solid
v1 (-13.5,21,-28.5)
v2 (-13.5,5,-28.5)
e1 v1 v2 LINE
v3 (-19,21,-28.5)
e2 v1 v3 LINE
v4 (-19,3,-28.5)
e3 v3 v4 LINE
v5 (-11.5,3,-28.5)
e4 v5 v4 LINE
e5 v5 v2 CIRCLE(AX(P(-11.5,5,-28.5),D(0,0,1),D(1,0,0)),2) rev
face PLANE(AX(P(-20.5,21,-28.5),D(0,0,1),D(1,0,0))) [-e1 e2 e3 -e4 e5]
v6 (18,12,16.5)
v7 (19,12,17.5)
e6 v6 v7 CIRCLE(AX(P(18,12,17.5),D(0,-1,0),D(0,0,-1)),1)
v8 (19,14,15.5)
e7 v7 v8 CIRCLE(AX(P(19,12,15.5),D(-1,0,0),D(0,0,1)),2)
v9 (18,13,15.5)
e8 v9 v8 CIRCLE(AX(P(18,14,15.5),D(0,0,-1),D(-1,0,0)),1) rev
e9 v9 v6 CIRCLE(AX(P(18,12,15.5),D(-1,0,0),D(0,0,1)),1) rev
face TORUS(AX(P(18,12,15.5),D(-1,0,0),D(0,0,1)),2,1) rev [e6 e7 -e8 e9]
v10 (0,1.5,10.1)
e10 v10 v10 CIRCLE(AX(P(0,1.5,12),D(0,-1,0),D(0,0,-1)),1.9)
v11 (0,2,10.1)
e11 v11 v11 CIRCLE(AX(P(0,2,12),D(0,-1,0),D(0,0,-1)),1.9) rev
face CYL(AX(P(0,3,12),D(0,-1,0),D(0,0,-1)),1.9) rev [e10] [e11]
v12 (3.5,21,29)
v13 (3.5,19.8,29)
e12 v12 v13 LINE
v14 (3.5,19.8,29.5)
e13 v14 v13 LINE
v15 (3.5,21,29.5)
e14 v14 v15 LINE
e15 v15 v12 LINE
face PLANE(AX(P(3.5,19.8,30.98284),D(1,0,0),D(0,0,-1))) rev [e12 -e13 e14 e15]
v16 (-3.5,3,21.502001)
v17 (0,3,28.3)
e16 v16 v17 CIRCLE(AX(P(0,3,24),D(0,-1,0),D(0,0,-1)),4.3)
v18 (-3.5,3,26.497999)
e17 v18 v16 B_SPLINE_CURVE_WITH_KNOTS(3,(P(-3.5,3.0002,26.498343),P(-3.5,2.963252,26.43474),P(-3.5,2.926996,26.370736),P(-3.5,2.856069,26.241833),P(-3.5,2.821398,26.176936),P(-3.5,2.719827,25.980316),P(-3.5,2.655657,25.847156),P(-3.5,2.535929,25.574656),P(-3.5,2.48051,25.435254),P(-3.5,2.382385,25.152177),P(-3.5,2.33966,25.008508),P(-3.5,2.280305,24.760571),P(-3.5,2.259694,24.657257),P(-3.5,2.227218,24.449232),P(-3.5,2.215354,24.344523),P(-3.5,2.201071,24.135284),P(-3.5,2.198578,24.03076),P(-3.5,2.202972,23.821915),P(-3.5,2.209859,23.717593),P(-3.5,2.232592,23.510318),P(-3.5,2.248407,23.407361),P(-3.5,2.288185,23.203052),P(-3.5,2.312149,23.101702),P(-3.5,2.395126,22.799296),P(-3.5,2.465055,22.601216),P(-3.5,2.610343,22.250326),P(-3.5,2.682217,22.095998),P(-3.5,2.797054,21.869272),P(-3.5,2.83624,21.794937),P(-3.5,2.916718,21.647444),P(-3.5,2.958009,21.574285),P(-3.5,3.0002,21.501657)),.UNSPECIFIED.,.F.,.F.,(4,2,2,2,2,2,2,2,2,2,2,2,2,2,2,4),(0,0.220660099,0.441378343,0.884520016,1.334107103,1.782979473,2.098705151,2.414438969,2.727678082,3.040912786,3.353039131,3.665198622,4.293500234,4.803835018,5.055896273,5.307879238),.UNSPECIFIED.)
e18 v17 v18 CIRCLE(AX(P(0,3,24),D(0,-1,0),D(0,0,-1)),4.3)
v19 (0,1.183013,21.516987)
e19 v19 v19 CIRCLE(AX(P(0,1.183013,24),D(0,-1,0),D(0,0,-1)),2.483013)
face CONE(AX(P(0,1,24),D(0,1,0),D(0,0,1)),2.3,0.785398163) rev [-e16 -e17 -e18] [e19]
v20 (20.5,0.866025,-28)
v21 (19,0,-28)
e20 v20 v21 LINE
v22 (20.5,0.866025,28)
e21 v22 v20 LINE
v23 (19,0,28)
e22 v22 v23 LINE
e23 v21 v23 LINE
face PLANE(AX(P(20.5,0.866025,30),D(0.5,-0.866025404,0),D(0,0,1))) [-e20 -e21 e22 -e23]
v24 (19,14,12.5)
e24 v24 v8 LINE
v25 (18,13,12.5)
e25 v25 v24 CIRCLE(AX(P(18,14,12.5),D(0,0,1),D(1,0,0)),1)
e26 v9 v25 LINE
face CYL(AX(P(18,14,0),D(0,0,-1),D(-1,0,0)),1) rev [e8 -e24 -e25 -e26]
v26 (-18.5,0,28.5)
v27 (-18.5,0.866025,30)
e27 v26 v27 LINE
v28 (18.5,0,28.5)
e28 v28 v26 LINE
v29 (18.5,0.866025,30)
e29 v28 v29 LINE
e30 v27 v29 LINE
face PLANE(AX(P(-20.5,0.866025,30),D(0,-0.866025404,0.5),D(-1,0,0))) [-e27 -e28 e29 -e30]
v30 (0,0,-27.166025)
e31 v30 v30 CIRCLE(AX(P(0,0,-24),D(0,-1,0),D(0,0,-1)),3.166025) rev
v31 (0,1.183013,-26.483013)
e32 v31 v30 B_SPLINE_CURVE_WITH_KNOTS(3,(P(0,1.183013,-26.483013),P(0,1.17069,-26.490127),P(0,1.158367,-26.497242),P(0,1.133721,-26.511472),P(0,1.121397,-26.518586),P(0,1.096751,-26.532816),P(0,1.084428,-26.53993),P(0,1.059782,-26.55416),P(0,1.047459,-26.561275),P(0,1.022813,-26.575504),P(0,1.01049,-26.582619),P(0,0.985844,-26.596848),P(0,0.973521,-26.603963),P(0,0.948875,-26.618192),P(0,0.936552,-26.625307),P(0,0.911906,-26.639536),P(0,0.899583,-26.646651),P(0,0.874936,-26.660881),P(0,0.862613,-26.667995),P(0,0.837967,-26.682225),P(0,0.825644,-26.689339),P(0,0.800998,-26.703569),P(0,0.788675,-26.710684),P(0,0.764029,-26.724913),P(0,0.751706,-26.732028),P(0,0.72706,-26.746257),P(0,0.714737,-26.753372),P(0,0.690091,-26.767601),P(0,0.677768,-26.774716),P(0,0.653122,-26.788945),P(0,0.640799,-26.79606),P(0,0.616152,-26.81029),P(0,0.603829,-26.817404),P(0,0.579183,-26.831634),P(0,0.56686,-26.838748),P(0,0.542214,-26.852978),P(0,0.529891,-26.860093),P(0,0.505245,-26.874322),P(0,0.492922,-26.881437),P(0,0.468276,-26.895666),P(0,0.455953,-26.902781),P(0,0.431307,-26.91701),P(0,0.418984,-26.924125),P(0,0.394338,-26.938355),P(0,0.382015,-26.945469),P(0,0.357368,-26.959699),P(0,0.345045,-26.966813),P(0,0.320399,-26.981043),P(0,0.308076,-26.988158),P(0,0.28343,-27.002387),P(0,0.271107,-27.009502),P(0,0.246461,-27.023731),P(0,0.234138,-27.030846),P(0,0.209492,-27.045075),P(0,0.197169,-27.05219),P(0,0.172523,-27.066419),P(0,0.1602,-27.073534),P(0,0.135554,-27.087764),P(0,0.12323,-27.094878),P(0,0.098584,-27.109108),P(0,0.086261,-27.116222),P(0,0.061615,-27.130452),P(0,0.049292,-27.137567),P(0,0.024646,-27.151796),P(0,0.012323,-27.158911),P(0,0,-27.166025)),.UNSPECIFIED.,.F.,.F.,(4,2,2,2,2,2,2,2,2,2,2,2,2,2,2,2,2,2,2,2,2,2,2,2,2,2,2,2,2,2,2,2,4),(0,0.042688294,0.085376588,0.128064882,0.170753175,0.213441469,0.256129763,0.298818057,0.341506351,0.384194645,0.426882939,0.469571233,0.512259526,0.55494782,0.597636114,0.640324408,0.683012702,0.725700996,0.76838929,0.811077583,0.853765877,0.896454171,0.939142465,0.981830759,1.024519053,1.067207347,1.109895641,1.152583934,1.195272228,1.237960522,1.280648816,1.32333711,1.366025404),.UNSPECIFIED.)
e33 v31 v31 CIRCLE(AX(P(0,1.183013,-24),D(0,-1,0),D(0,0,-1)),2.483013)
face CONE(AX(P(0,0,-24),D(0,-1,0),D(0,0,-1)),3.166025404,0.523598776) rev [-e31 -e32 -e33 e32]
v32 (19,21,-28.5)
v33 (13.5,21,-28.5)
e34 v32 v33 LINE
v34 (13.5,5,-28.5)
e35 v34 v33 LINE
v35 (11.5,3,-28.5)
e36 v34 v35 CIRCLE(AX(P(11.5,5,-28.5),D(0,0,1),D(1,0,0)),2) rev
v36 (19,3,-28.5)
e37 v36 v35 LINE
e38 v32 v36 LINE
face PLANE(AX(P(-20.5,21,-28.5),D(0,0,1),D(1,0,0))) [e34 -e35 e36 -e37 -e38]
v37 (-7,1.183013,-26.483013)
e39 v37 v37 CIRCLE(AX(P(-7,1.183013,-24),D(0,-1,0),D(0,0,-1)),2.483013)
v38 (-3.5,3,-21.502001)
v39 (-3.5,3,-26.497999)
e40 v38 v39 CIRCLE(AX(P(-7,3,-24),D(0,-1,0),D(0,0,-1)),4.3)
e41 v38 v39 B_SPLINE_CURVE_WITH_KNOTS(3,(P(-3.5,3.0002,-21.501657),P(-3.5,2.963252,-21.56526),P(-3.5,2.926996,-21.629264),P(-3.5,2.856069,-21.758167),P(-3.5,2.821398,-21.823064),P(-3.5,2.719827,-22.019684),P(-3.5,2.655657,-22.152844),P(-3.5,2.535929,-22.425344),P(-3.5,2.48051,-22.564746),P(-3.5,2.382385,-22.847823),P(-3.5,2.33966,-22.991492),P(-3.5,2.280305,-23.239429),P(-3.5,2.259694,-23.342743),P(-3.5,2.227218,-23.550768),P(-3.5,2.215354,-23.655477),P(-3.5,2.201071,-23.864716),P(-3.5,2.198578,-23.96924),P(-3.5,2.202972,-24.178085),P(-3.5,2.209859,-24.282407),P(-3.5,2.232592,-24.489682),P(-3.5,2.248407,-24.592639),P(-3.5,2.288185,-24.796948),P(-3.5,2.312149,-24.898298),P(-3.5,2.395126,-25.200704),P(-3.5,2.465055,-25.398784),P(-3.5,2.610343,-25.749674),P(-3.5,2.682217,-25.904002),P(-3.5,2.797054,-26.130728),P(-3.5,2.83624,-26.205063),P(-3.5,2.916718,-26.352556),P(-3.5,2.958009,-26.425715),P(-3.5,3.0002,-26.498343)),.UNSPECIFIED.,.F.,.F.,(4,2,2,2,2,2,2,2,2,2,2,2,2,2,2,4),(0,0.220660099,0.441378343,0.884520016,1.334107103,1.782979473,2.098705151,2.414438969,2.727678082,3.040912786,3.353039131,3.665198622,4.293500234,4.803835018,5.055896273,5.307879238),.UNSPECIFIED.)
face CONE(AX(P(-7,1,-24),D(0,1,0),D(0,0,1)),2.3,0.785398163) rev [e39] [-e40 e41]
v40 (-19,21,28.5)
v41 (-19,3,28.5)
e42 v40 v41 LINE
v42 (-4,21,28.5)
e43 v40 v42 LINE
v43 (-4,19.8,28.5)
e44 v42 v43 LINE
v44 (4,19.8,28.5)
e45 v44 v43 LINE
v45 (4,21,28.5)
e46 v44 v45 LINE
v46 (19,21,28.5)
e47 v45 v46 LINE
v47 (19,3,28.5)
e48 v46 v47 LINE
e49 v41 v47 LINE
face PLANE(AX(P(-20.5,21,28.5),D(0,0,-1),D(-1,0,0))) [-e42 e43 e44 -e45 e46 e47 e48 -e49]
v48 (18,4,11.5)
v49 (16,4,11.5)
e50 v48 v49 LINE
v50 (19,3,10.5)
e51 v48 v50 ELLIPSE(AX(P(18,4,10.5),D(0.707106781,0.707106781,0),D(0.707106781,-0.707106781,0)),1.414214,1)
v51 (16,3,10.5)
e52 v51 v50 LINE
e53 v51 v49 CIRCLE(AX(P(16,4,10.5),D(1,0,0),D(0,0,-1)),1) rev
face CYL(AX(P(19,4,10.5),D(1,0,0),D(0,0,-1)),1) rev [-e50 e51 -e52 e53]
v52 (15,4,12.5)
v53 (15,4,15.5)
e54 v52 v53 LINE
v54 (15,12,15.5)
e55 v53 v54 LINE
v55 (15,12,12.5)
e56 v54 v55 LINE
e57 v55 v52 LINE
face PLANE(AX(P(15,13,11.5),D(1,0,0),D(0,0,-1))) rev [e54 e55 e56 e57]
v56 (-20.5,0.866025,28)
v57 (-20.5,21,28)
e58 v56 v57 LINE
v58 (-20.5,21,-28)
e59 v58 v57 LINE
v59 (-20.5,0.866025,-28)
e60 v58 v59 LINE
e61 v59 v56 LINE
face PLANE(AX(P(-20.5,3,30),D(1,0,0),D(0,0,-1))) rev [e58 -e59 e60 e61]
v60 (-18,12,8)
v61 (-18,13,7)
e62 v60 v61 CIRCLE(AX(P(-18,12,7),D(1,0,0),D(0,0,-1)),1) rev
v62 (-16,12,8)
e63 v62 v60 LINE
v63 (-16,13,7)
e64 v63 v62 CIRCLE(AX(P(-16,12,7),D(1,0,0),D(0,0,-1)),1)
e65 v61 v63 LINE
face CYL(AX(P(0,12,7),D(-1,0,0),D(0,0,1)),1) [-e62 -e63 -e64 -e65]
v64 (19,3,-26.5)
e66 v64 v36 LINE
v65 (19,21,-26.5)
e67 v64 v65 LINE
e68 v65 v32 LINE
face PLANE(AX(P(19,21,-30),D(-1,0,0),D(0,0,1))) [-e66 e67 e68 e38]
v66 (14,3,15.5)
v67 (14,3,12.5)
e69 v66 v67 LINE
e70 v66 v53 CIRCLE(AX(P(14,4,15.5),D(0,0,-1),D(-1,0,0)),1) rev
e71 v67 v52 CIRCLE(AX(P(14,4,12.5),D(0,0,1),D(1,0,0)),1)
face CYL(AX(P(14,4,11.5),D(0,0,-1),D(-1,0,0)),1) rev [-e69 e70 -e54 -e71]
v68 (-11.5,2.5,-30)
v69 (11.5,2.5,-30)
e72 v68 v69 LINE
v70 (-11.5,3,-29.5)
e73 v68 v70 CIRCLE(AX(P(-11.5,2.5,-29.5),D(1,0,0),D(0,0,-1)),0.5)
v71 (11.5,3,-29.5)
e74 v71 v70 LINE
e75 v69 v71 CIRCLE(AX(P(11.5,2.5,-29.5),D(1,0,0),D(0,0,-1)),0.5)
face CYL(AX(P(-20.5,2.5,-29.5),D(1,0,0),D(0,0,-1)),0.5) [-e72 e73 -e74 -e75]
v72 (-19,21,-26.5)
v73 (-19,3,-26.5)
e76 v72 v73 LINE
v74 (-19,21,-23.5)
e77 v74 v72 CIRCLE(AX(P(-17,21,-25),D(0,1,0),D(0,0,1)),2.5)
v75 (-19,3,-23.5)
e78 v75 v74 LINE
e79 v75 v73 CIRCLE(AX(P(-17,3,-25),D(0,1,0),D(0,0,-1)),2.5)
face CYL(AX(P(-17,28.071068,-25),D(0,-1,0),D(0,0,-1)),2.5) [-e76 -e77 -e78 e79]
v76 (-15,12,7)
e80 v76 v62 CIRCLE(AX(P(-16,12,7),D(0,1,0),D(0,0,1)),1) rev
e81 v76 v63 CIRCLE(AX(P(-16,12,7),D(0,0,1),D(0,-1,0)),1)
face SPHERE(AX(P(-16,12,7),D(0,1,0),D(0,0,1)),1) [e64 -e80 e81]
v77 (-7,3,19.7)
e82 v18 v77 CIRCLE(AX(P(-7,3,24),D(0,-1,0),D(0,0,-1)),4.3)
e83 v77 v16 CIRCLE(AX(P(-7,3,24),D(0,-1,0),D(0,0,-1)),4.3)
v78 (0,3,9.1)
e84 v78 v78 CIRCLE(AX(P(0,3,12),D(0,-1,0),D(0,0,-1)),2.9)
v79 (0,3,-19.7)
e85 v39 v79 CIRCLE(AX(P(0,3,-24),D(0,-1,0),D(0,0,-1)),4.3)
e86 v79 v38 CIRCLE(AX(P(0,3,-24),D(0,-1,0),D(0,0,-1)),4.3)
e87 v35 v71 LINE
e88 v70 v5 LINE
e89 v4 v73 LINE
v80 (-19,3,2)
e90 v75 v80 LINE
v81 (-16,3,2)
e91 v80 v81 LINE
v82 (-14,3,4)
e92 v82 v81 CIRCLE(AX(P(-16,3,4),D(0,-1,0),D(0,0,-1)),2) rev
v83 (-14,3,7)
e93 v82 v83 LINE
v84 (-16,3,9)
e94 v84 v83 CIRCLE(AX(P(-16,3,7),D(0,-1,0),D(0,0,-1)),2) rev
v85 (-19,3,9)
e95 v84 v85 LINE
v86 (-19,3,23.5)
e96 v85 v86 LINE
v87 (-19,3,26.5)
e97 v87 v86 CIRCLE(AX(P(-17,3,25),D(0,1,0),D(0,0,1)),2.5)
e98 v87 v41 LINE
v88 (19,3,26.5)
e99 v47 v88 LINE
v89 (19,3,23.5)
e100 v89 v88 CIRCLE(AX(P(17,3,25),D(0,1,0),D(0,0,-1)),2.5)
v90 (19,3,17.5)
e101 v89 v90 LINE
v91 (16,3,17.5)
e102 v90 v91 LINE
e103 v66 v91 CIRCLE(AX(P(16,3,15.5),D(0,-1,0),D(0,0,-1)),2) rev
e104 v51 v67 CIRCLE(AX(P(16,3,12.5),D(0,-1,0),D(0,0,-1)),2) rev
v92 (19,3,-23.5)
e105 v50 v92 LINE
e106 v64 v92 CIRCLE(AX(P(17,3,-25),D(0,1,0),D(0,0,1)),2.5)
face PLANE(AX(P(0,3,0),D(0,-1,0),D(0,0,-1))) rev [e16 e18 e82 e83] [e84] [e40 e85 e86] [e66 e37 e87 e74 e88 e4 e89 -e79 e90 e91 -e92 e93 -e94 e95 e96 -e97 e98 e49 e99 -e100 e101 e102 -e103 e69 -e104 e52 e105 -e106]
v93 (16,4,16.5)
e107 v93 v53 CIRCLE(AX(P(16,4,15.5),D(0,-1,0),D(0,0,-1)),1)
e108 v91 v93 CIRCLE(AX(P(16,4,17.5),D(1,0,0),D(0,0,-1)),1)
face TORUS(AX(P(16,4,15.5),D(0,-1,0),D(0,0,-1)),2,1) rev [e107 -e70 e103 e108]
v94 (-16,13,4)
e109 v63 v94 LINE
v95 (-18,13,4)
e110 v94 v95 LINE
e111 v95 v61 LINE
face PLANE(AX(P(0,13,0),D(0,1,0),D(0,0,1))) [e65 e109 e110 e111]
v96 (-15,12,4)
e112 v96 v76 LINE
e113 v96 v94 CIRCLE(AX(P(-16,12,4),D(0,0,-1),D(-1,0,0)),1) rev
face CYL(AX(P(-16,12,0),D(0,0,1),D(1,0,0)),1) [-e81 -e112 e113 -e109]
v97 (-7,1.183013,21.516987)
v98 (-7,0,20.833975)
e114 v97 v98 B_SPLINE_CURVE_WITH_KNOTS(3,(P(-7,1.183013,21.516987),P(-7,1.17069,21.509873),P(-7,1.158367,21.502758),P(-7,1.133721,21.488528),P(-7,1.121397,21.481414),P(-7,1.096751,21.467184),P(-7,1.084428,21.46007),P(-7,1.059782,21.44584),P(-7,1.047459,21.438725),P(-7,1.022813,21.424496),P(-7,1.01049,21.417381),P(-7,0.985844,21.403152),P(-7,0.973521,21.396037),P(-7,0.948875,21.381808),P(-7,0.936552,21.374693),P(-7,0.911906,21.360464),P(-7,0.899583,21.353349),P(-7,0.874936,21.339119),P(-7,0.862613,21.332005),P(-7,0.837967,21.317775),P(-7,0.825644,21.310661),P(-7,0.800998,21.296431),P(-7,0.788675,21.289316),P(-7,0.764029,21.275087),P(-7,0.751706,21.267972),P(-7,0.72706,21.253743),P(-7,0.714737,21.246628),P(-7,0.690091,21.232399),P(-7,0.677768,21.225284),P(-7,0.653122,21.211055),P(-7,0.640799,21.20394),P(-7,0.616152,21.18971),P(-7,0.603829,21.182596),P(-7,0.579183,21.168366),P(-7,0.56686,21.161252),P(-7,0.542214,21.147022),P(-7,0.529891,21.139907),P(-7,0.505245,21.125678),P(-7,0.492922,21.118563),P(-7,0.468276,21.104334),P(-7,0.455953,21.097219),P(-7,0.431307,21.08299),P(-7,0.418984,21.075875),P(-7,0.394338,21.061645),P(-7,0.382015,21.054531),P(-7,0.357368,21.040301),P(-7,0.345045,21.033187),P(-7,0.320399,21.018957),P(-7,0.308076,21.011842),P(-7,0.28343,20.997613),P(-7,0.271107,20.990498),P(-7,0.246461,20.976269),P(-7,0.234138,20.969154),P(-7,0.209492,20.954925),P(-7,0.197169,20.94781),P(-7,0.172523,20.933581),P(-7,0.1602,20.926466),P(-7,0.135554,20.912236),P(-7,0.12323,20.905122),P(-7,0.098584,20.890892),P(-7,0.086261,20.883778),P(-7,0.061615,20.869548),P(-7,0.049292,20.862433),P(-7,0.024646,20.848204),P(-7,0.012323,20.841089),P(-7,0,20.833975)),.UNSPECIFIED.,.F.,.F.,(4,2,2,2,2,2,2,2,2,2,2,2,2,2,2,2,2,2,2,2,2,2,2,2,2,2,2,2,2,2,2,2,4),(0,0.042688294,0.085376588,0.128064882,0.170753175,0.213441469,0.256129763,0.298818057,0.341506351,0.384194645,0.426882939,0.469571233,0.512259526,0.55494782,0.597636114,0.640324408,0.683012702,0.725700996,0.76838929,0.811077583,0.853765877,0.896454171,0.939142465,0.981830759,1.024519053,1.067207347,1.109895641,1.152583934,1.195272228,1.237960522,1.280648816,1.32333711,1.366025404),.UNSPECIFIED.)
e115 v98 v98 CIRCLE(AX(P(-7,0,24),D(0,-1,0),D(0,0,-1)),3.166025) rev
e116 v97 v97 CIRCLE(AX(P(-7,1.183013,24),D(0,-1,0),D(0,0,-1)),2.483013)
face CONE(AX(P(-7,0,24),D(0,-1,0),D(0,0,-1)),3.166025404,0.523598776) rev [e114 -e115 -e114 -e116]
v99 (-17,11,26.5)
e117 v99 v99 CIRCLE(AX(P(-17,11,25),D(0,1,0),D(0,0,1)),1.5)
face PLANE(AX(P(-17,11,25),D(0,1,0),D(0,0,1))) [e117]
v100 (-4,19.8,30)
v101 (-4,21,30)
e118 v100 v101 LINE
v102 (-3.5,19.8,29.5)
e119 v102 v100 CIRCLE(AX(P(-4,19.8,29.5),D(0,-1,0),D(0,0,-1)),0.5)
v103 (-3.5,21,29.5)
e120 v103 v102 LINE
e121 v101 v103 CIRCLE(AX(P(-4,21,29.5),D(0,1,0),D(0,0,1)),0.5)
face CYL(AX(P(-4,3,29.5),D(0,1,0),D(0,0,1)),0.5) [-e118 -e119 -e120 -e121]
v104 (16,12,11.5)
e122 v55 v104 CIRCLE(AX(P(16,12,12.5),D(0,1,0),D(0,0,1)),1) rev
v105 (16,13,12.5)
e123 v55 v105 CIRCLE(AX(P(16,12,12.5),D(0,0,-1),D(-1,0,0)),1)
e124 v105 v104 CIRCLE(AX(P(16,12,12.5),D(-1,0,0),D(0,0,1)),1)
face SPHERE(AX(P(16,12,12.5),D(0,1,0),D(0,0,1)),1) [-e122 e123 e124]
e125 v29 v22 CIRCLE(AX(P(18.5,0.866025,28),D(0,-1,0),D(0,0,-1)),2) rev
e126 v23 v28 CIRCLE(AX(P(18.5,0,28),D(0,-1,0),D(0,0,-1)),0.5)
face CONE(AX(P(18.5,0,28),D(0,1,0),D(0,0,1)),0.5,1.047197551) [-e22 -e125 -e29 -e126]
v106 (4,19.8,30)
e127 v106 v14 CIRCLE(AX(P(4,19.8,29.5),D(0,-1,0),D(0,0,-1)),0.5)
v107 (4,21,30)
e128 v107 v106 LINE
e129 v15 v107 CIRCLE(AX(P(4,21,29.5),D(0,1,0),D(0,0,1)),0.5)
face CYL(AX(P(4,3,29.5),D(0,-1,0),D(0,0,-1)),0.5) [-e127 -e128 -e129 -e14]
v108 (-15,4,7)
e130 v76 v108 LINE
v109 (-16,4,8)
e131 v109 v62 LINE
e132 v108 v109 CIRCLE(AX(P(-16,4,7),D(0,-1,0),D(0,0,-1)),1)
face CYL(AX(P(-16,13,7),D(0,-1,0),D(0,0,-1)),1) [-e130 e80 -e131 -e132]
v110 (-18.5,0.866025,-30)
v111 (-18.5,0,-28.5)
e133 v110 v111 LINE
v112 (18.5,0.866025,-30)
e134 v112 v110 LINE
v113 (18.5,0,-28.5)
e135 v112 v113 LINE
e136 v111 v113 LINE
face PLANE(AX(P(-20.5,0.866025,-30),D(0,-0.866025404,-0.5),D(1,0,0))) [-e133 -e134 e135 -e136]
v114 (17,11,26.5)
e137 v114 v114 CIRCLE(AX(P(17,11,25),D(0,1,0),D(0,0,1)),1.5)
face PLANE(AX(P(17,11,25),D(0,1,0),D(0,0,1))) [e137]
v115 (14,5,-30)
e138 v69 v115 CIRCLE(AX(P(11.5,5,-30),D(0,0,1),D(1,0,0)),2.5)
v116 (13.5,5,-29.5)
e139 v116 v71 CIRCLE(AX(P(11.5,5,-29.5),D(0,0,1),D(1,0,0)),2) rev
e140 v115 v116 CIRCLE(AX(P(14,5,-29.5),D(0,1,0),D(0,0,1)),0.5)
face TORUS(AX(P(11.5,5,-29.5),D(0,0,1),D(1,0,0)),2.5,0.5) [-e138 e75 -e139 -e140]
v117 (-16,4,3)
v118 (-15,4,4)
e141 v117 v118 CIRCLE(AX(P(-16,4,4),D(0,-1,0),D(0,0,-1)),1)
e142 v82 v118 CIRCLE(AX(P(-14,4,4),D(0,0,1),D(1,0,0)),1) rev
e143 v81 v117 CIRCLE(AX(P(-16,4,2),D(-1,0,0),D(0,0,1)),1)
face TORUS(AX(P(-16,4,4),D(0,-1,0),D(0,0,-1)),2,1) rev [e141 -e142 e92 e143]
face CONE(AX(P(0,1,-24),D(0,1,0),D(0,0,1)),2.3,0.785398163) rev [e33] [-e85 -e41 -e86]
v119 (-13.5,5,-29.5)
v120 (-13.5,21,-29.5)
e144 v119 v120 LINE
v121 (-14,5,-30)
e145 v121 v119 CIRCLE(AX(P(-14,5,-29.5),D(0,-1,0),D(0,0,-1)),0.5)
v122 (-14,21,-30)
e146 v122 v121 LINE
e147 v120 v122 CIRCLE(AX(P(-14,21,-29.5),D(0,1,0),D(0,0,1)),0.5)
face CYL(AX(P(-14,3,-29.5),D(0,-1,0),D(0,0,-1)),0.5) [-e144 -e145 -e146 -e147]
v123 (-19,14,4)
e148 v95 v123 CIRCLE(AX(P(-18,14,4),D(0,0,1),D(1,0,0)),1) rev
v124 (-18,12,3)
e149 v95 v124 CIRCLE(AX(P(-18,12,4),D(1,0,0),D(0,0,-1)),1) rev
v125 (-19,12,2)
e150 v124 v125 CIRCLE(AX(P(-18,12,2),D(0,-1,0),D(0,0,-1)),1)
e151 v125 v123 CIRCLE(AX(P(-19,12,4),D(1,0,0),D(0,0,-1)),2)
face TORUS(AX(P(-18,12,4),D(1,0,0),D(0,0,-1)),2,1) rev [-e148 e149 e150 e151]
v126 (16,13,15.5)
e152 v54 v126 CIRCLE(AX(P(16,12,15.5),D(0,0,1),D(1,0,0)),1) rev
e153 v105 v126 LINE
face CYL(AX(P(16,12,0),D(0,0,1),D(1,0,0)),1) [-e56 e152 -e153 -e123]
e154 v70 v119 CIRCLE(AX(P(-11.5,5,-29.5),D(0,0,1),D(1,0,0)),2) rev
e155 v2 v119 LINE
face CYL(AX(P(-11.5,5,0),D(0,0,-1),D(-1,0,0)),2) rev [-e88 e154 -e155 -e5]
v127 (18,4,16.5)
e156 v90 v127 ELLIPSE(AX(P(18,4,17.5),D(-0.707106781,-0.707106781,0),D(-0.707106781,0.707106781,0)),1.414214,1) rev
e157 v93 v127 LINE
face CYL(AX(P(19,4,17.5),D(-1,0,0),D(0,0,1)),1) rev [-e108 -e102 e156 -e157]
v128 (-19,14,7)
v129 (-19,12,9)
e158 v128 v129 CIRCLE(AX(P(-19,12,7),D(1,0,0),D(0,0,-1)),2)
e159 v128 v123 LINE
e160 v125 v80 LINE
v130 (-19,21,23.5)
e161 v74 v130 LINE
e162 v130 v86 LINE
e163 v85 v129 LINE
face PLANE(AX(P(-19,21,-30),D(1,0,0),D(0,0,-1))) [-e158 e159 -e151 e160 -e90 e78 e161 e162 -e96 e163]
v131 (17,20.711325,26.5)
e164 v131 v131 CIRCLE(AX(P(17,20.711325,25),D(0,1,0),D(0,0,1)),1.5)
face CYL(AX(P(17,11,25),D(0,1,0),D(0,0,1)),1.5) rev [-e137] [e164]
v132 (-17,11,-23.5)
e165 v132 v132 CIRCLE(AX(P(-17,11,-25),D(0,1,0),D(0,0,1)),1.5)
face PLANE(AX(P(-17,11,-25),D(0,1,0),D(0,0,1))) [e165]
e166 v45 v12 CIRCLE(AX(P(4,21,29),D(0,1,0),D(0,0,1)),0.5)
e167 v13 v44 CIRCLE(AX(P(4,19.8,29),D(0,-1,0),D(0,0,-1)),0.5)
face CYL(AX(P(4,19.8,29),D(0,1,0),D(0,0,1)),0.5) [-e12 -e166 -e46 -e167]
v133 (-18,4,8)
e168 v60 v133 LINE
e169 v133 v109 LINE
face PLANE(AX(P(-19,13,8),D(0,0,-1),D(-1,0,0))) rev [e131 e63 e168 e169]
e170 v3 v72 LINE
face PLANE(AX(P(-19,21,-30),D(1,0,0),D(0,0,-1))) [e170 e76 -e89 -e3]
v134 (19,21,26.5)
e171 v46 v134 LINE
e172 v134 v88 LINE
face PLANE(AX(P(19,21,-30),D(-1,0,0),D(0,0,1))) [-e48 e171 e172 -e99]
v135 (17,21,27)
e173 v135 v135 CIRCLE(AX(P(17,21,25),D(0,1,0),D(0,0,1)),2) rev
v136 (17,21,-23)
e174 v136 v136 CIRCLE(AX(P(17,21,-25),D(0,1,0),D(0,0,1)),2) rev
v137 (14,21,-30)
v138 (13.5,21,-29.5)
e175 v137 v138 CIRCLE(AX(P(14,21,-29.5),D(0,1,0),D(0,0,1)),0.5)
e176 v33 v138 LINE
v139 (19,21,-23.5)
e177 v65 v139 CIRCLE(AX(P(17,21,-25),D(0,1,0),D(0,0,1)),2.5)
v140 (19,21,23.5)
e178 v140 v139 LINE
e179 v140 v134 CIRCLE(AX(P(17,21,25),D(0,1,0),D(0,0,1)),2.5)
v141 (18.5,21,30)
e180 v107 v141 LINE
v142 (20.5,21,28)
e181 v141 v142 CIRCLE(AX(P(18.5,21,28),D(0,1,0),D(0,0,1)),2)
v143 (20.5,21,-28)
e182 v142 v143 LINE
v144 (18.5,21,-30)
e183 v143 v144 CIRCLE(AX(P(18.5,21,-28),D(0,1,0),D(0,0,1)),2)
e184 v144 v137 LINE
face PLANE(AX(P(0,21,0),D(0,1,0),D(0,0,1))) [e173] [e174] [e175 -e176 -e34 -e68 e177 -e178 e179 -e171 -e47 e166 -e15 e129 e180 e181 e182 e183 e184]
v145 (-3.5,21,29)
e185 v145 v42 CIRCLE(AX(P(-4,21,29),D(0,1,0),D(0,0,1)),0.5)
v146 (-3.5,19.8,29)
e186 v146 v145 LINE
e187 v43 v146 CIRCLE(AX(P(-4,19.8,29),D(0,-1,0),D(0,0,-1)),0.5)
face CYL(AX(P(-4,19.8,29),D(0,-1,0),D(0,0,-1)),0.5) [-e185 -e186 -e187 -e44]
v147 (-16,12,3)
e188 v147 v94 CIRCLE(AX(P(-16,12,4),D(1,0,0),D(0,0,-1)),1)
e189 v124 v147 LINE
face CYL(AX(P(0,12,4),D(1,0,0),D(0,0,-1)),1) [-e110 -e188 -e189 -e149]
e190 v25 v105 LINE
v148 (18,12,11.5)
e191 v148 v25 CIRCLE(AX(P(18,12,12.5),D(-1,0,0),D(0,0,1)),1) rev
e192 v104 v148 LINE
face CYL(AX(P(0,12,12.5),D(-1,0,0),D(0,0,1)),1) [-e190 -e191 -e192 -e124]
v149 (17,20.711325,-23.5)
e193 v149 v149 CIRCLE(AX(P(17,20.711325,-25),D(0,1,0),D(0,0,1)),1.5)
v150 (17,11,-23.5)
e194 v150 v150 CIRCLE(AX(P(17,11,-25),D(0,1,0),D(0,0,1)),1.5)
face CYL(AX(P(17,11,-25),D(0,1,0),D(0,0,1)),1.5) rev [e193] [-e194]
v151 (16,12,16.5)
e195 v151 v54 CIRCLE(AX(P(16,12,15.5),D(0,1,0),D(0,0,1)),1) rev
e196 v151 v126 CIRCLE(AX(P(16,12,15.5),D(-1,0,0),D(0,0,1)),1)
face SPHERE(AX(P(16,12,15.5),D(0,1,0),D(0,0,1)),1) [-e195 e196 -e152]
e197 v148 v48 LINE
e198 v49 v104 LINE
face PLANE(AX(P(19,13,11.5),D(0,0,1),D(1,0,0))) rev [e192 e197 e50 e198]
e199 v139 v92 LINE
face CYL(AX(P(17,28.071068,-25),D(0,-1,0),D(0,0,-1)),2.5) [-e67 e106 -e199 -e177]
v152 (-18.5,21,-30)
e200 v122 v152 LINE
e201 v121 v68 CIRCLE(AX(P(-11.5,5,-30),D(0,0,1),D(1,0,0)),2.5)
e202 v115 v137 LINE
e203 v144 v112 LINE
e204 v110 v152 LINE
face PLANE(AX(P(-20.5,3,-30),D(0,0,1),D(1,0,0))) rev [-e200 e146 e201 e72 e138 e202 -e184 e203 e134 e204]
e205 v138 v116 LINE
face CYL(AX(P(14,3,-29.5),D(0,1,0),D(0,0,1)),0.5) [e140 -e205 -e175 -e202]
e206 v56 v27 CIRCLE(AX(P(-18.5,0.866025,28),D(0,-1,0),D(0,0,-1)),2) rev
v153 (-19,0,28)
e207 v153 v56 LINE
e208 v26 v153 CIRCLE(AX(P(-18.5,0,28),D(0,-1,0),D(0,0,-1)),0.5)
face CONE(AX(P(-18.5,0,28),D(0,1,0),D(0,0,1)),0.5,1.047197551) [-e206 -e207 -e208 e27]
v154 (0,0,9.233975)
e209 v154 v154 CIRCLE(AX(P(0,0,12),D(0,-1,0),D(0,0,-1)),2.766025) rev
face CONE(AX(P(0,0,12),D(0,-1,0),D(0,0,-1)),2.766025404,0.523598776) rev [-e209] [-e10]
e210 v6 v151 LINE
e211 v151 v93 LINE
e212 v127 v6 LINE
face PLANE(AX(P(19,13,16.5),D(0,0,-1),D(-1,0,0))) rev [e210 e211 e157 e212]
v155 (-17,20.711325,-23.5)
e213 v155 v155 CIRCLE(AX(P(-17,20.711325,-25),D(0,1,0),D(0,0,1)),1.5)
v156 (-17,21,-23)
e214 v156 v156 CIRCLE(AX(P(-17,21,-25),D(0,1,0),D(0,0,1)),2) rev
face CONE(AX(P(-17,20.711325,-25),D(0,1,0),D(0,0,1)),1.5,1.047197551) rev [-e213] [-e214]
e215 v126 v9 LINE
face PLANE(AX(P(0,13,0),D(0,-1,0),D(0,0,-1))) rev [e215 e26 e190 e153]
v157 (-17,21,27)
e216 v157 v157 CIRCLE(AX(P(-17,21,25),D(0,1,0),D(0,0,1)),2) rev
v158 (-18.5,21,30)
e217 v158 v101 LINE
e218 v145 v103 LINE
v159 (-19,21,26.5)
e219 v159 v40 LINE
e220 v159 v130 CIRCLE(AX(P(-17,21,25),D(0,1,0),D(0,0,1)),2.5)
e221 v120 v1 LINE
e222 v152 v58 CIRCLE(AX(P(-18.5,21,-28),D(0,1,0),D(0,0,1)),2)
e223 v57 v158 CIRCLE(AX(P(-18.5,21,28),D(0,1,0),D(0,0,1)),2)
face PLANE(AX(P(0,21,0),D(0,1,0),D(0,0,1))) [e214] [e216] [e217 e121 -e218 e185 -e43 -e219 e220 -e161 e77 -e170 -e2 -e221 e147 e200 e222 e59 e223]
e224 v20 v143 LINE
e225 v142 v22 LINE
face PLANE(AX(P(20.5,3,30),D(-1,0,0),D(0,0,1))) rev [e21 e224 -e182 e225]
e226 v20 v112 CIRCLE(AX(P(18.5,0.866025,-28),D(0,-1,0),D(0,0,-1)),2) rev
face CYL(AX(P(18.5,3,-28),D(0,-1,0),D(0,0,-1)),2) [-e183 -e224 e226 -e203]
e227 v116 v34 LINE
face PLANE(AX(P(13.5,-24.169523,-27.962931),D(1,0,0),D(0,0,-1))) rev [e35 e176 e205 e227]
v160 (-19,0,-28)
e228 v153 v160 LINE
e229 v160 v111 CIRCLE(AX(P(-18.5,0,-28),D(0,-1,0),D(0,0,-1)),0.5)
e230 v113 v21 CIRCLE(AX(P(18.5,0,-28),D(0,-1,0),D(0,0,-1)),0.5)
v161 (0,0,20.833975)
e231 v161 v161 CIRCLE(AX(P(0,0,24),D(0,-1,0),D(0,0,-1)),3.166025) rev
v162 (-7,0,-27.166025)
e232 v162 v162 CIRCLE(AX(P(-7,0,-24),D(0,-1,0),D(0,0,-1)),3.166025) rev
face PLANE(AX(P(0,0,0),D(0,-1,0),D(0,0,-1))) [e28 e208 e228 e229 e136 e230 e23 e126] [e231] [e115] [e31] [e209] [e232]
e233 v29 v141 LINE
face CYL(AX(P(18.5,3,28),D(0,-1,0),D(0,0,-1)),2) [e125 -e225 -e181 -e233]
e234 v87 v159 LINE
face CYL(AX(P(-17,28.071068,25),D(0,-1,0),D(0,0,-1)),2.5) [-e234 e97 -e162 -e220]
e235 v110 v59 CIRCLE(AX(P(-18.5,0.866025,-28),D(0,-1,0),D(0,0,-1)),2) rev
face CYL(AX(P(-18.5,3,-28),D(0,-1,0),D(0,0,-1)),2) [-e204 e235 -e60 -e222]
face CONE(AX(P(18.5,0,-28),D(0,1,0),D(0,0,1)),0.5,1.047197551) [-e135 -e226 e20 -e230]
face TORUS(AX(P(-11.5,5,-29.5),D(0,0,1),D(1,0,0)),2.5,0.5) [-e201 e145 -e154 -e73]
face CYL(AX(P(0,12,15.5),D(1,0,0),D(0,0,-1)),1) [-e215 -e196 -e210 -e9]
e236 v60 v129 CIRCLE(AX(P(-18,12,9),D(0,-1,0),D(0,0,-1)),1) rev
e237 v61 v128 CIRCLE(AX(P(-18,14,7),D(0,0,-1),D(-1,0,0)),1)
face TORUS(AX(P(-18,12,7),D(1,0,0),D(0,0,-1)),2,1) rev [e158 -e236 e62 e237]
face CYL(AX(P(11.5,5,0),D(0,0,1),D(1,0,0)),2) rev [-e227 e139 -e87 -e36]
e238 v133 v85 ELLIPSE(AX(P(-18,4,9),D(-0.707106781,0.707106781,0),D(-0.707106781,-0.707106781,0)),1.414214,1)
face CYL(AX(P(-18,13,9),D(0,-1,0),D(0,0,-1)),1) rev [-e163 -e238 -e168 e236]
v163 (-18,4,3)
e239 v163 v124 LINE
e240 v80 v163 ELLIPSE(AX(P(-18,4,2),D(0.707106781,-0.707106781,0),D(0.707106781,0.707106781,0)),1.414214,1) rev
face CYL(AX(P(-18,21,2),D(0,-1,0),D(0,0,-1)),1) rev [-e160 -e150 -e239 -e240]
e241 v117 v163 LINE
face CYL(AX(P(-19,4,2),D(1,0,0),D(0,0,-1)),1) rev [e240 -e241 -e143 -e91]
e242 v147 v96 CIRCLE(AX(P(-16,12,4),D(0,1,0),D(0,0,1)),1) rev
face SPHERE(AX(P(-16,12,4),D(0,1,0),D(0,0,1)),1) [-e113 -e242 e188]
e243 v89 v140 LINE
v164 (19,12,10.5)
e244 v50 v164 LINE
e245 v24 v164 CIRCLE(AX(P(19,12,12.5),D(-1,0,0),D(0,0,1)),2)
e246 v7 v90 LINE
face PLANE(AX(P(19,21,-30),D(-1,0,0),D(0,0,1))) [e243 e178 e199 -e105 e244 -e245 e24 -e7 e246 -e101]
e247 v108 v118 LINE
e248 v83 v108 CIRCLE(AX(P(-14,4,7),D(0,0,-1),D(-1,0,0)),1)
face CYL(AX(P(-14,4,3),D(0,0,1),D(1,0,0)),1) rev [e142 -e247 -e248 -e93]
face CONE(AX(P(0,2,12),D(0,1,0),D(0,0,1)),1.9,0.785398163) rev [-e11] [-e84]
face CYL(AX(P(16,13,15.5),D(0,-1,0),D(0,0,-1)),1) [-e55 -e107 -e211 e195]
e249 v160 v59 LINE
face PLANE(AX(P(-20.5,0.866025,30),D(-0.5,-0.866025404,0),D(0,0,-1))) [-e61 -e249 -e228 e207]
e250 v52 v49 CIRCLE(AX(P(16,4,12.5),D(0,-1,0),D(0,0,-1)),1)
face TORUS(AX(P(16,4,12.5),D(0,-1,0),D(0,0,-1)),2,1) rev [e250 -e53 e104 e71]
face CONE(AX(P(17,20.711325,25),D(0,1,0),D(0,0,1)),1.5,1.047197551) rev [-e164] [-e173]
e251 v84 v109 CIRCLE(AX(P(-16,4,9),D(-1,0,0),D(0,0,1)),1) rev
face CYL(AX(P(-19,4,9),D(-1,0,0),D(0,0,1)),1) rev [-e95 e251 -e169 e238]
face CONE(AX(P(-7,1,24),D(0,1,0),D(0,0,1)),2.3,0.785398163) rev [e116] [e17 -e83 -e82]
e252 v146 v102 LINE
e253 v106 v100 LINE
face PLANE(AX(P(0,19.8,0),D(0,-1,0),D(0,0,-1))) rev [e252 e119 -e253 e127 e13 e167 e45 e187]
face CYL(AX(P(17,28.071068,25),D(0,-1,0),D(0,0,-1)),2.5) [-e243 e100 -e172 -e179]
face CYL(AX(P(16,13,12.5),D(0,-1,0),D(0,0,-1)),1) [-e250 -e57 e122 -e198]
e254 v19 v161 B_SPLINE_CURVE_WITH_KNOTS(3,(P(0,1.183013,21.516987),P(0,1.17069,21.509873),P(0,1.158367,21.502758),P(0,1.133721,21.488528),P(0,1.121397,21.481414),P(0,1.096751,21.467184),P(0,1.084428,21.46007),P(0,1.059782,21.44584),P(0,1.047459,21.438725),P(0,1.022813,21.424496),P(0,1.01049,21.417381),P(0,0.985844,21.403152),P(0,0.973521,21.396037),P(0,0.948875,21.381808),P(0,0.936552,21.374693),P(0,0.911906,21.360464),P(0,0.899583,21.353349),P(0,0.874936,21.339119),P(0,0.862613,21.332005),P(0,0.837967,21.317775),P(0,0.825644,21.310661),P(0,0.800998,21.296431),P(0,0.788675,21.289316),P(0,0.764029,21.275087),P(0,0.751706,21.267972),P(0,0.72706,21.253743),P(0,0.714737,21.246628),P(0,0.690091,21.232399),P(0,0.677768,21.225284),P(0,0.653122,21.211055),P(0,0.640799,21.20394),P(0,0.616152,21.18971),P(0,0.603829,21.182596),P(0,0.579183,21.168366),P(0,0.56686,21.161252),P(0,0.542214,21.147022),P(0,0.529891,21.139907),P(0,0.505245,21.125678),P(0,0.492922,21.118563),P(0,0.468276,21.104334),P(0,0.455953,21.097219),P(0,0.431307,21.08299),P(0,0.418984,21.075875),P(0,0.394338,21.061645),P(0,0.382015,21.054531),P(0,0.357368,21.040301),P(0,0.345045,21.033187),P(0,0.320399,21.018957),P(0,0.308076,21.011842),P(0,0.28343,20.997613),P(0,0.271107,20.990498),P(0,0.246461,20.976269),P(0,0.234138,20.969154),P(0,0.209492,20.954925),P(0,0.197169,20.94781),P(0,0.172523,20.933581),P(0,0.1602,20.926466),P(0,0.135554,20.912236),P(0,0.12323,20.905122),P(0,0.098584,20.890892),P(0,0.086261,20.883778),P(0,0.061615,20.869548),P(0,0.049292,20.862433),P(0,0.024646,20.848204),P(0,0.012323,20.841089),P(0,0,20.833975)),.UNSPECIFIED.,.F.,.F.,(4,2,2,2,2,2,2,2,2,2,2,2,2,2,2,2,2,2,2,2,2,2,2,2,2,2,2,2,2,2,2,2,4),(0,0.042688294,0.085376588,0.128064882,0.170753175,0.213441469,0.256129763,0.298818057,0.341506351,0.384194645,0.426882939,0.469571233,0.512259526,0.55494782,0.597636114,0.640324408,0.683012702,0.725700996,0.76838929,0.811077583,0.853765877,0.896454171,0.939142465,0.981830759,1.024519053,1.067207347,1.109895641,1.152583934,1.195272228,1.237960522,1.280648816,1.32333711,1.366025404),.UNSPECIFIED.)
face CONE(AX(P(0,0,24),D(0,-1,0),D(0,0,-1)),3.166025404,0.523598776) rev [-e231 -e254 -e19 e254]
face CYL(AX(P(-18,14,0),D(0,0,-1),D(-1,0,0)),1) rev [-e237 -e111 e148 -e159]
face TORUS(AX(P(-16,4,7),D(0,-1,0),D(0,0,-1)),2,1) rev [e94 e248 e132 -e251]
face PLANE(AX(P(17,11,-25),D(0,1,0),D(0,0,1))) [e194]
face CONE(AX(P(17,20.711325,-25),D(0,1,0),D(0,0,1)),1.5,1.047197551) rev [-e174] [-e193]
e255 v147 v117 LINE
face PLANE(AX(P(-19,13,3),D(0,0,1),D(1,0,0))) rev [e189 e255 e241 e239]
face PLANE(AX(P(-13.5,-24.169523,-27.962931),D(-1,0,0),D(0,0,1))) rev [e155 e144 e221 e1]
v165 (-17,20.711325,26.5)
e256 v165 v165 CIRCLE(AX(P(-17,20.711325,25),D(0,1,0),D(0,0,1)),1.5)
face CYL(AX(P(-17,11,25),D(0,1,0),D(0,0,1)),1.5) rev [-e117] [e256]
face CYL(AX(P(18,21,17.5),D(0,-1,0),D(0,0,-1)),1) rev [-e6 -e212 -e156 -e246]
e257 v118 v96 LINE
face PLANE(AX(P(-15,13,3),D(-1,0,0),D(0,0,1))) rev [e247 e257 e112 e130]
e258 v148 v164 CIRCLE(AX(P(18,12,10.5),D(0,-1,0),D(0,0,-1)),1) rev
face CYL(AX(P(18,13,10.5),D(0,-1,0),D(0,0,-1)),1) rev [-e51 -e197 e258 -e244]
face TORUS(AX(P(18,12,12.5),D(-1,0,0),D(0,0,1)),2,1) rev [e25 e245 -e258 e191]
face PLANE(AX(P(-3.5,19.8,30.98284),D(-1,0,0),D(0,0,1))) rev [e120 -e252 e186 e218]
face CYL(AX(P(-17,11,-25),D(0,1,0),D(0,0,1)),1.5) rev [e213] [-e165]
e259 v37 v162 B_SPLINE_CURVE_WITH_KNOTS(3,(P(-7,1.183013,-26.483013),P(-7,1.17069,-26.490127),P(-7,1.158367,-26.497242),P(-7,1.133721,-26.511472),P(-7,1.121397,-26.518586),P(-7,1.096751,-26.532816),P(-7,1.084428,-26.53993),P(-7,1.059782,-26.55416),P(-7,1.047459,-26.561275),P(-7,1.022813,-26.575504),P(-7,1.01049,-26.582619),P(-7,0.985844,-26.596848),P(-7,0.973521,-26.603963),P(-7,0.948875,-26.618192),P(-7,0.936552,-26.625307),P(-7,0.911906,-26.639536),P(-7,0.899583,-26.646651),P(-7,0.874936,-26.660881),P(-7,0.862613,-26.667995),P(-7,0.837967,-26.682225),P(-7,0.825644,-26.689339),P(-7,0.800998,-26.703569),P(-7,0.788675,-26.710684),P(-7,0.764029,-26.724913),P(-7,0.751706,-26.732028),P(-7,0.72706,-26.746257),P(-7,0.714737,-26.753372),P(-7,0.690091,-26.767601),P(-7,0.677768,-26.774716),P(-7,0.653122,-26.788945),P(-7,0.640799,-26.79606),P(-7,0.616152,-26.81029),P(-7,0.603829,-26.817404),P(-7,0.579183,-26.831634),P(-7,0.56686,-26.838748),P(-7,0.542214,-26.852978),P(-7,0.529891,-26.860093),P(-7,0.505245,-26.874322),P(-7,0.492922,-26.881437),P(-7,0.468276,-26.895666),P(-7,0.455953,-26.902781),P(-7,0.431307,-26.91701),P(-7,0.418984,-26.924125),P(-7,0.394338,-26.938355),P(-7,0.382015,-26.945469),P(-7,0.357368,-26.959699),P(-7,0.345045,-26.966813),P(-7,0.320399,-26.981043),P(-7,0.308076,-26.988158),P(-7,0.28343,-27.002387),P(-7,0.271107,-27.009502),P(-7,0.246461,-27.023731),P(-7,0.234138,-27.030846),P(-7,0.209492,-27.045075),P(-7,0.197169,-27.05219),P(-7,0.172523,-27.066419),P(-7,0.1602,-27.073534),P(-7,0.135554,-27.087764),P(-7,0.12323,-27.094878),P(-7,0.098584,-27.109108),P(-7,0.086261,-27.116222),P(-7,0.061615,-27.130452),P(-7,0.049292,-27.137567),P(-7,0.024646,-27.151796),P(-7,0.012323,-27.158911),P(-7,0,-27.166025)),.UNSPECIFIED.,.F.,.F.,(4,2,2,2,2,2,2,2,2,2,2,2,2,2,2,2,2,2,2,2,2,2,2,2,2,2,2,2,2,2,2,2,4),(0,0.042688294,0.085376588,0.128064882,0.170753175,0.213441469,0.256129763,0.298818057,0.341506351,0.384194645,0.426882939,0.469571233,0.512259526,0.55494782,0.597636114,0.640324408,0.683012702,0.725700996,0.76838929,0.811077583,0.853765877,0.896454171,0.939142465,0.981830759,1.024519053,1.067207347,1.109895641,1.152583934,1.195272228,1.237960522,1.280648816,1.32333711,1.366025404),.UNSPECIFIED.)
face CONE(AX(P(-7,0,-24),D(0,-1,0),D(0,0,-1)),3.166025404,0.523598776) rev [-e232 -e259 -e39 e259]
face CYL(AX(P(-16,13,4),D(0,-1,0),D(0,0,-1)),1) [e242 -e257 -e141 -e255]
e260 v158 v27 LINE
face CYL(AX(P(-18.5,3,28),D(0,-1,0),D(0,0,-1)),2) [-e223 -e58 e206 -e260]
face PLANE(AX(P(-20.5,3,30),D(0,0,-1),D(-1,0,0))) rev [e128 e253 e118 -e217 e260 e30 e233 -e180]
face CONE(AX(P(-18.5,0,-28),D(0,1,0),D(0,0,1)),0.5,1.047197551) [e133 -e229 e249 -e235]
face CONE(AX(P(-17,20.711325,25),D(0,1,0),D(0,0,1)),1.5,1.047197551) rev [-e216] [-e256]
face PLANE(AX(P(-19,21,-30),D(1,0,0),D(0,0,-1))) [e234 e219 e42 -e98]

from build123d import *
from OCP.BRepFilletAPI import BRepFilletAPI_MakeChamfer

# Parameters (mm, degrees)
SKETCH_1_W          = 41
SKETCH_1_H          = 60
SKETCH_1_R          = 2.3
SKETCH_1_R_2        = 1.9
EXTRUDE_1_DEPTH     = 3
CHAMFER_1_SIZE      = 2
SKETCH_2_W          = 41
SKETCH_2_H          = 60
SKETCH_2_W_2        = 38
SKETCH_2_H_2        = 57
EXTRUDE_1_2_DEPTH   = 18
SKETCH_3_W          = 27
SKETCH_3_H          = 3.030341357
CUT_EXTRUDE_1_DEPTH = 18
SKETCH_4_R          = 2.5
EXTRUDE_2_DEPTH     = 18
SKETCH_5_R          = 1.5
CUT_EXTRUDE_2_DEPTH = 10
SKETCH_7_W          = 7
SKETCH_7_H          = 4.356080651
CUT_EXTRUDE_3_DEPTH = 1.2
FILLET_2_R          = 0.5
FILLET_3_R          = 2
CHAMFER_4_SIZE      = 0.866025404
CHAMFER_4_SIZE_2    = 1.5
CHAMFER_6_SIZE      = 0.5
CHAMFER_6_SIZE2     = 0.288675135
SKETCH_8_W          = 4
SKETCH_8_H          = 5
EXTRUDE_3_DEPTH     = 10
FILLET_6_R          = 1
FILLET_7_R          = 2
FILLET_8_R          = 0.5
CHAMFER_7_SIZE      = 1


with BuildPart() as part:
    # Эскиз1 → Extrude 1 (new body)
    with BuildSketch(Plane(origin=(0, 0, 0), x_dir=(1, 0, 0), z_dir=(0, 1, 0))):
        Rectangle(SKETCH_1_W, SKETCH_1_H)
        with Locations(Location((0, 24, 0), (0, 0, 270))):
            Circle(SKETCH_1_R, mode=Mode.SUBTRACT)
        with Locations(Location((0, -24, 0), (0, 0, 270))):
            Circle(SKETCH_1_R, mode=Mode.SUBTRACT)
        with Locations(Location((0, -12, 0), (0, 0, 270))):
            Circle(SKETCH_1_R_2, mode=Mode.SUBTRACT)
        with Locations(Location((-7, -24, 0), (0, 0, 90))):
            Circle(SKETCH_1_R, mode=Mode.SUBTRACT)
        with Locations(Location((-7, 24, 0), (0, 0, 90))):
            Circle(SKETCH_1_R, mode=Mode.SUBTRACT)
    extrude(amount=EXTRUDE_1_DEPTH)

    # Фаска1
    # the kernel refuses this chamfer: 2 mm, written as the material it takes off along each edge
    with BuildSketch(Plane(origin=(0, 3, -24), x_dir=(0, 0, 1), z_dir=(-1, 0, 0))) as chamfer_1_piece_1:
        Polygon((2.3, -CHAMFER_1_SIZE), (2.3 + CHAMFER_1_SIZE, 0), (2.3, 0), align=None)
    revolve(axis=Axis((0, 3, -24), (0, 1, 0)), mode=Mode.SUBTRACT)
    with BuildSketch(Plane(origin=(0, 3, 24), x_dir=(0, 0, 1), z_dir=(-1, 0, 0))) as chamfer_1_piece_2:
        Polygon((2.3, -CHAMFER_1_SIZE), (2.3 + CHAMFER_1_SIZE, 0), (2.3, 0), align=None)
    revolve(axis=Axis((0, 3, 24), (0, 1, 0)), mode=Mode.SUBTRACT)
    with BuildSketch(Plane(origin=(-7, 3, 24), x_dir=(0, 0, -1), z_dir=(1, 0, 0))) as chamfer_1_piece_3:
        Polygon((2.3, -CHAMFER_1_SIZE), (2.3 + CHAMFER_1_SIZE, 0), (2.3, 0), align=None)
    revolve(axis=Axis((-7, 3, 24), (0, 1, 0)), mode=Mode.SUBTRACT)
    with BuildSketch(Plane(origin=(-7, 3, -24), x_dir=(0, 0, -1), z_dir=(1, 0, 0))) as chamfer_1_piece_4:
        Polygon((2.3, -CHAMFER_1_SIZE), (2.3 + CHAMFER_1_SIZE, 0), (2.3, 0), align=None)
    revolve(axis=Axis((-7, 3, -24), (0, 1, 0)), mode=Mode.SUBTRACT)

    # Эскиз2 → Extrude 1 2 (add)
    with BuildSketch(Plane(origin=(0, 3, 0), x_dir=(1, 0, 0), z_dir=(0, 1, 0))):
        Rectangle(SKETCH_2_W, SKETCH_2_H)
        Rectangle(SKETCH_2_W_2, SKETCH_2_H_2, mode=Mode.SUBTRACT)
    extrude(amount=EXTRUDE_1_2_DEPTH)

    # Эскиз3 → Вырез-Вытянуть1 (cut)
    with BuildSketch(Plane(origin=(0, 21, 0), x_dir=(1, 0, 0), z_dir=(0, 1, 0))):
        with Locations((0, 29.478101209)):
            Rectangle(SKETCH_3_W, SKETCH_3_H)
    extrude(amount=-CUT_EXTRUDE_1_DEPTH, mode=Mode.SUBTRACT)

    # Эскиз4 → Бобышка-Вытянуть2 (add)
    with BuildSketch(Plane(origin=(0, 3, 0), x_dir=(1, 0, 0), z_dir=(0, 1, 0))):
        with Locations((17, 25)):
            Circle(SKETCH_4_R)
        with Locations((-17, 25)):
            Circle(SKETCH_4_R)
        with Locations((17, -25)):
            Circle(SKETCH_4_R)
        with Locations((-17, -25)):
            Circle(SKETCH_4_R)
    extrude(amount=EXTRUDE_2_DEPTH)

    # Эскиз5 → Вырез-Вытянуть2 (cut)
    with BuildSketch(Plane(origin=(0, 21, 0), x_dir=(1, 0, 0), z_dir=(0, 1, 0))):
        with Locations(Location((17, 25, 0), (0, 0, 270))):
            Circle(SKETCH_5_R)
        with Locations(Location((17, -25, 0), (0, 0, 270))):
            Circle(SKETCH_5_R)
        with Locations(Location((-17, -25, 0), (0, 0, 270))):
            Circle(SKETCH_5_R)
        with Locations(Location((-17, 25, 0), (0, 0, 270))):
            Circle(SKETCH_5_R)
    extrude(amount=-CUT_EXTRUDE_2_DEPTH, mode=Mode.SUBTRACT)

    # Эскиз7 → Вырез-Вытянуть3 (cut)
    with BuildSketch(Plane(origin=(0, 21, 0), x_dir=(1, 0, 0), z_dir=(0, 1, 0))):
        with Locations((0, -28.804800006)):
            Rectangle(SKETCH_7_W, SKETCH_7_H)
    extrude(amount=-CUT_EXTRUDE_3_DEPTH, mode=Mode.SUBTRACT)

    # Скругление2
    fillet_2_edges = [part.edges().sort_by_distance(p)[0] for p in [
        (-3.5, 20.4, 28.5),
        (3.5, 20.4, 28.5),
        (3.5, 20.4, 30),
        (-3.5, 20.4, 30),
    ]]
    fillet(fillet_2_edges, radius=FILLET_2_R)

    # Скругление3
    fillet_3_edges = [part.edges().sort_by_distance(p)[0] for p in [
        (20.5, 10.5, 30),
        (-20.5, 10.5, 30),
        (-20.5, 10.5, -30),
        (20.5, 10.5, -30),
    ]]
    fillet(fillet_3_edges, radius=FILLET_3_R)

    # Фаска4
    # the kernel refuses this chamfer: 1.5, 0.866025404 mm, written as the material it takes off along each edge
    with BuildSketch(Plane(origin=(0, 0, 24), x_dir=(0, 0, 1), z_dir=(-1, 0, 0))) as chamfer_4_piece_1:
        Polygon((2.3 + CHAMFER_4_SIZE, 0), (2.3, CHAMFER_4_SIZE_2), (2.3, 0), align=None)
    revolve(axis=Axis((0, 0, 24), (0, 1, 0)), mode=Mode.SUBTRACT)
    with BuildSketch(Plane(origin=(18.5, 0, -30), x_dir=(0, -0.01932676561270073, 0.999813220622208), z_dir=(-1, 0, 0))) as chamfer_4_piece_2:
        Polygon((CHAMFER_4_SIZE_2 * 0.999813220622, CHAMFER_4_SIZE_2 * 0.0193267656127), (-CHAMFER_4_SIZE * 0.0193267656079, CHAMFER_4_SIZE * 0.999813220373), (0, 0), align=None)
    extrude(amount=37, mode=Mode.SUBTRACT)
    with BuildSketch(Plane(origin=(-20.5, 0, -28), x_dir=(0.999813220622208, -0.01932676561270073, 0), z_dir=(0, 0, 1)), Plane(origin=(20.5, 0, 28), x_dir=(-0.999813220622208, -0.01932676561270073, 0), z_dir=(0, 0, -1))) as chamfer_4_piece_3:
        Polygon((CHAMFER_4_SIZE_2 * 0.999813220622, CHAMFER_4_SIZE_2 * 0.0193267656127), (-CHAMFER_4_SIZE * 0.0193267656079, CHAMFER_4_SIZE * 0.999813220373), (0, 0), align=None)
    extrude(amount=56, mode=Mode.SUBTRACT)
    with BuildSketch(Plane(origin=(-18.5, 0, 30), x_dir=(0, 0.9983227437537924, 0.0578938624026721), z_dir=(1, 0, 0))) as chamfer_4_piece_4:
        Polygon((CHAMFER_4_SIZE * 0.998322743505, -CHAMFER_4_SIZE * 0.0578938623883), (-CHAMFER_4_SIZE_2 * 0.0578938624027, -CHAMFER_4_SIZE_2 * 0.998322743754), (0, 0), align=None)
    extrude(amount=37, mode=Mode.SUBTRACT)
    with BuildSketch(Plane(origin=(-18.5, 0, -28), x_dir=(0, 0, -1), z_dir=(1, 0, 0))) as chamfer_4_piece_5:
        Polygon((2 - CHAMFER_4_SIZE_2, 0), (2, CHAMFER_4_SIZE), (2, 0), align=None)
    revolve(axis=Axis((-18.5, 0, -28), (0, 1, 0)), revolution_arc=90, mode=Mode.SUBTRACT)
    with BuildSketch(Plane(origin=(-18.5, 0, 28), x_dir=(0, 0, 1), z_dir=(1, 0, 0))) as chamfer_4_piece_6:
        Polygon((2 - CHAMFER_4_SIZE_2, 0), (2, -CHAMFER_4_SIZE), (2, 0), align=None)
    revolve(axis=Axis((-18.5, 0, 28), (0, -1, 0)), revolution_arc=90, mode=Mode.SUBTRACT)
    with BuildSketch(Plane(origin=(18.5, 0, 28), x_dir=(0, 0, 1), z_dir=(-1, 0, 0))) as chamfer_4_piece_7:
        Polygon((2, CHAMFER_4_SIZE), (2 - CHAMFER_4_SIZE_2, 0), (2, 0), align=None)
    revolve(axis=Axis((18.5, 0, 28), (0, 1, 0)), revolution_arc=90, mode=Mode.SUBTRACT)
    with BuildSketch(Plane(origin=(18.5, 0, -28), x_dir=(0, 0, -1), z_dir=(-1, 0, 0))) as chamfer_4_piece_8:
        Polygon((2 - CHAMFER_4_SIZE_2, 0), (2, -CHAMFER_4_SIZE), (2, 0), align=None)
    revolve(axis=Axis((18.5, 0, -28), (0, -1, 0)), revolution_arc=90, mode=Mode.SUBTRACT)
    with BuildSketch(Plane(origin=(0, 0, -24), x_dir=(0, 0, 1), z_dir=(-1, 0, 0))) as chamfer_4_piece_9:
        Polygon((2.3 + CHAMFER_4_SIZE, 0), (2.3, CHAMFER_4_SIZE_2), (2.3, 0), align=None)
    revolve(axis=Axis((0, 0, -24), (0, 1, 0)), mode=Mode.SUBTRACT)
    with BuildSketch(Plane(origin=(0, 0, 12), x_dir=(0, 0, 1), z_dir=(-1, 0, 0))) as chamfer_4_piece_10:
        Polygon((1.9 + CHAMFER_4_SIZE, 0), (1.9, CHAMFER_4_SIZE_2), (1.9, 0), align=None)
    revolve(axis=Axis((0, 0, 12), (0, 1, 0)), mode=Mode.SUBTRACT)
    with BuildSketch(Plane(origin=(-7, 0, -24), x_dir=(0, 0, -1), z_dir=(1, 0, 0))) as chamfer_4_piece_11:
        Polygon((2.3 + CHAMFER_4_SIZE, 0), (2.3, CHAMFER_4_SIZE_2), (2.3, 0), align=None)
    revolve(axis=Axis((-7, 0, -24), (0, 1, 0)), mode=Mode.SUBTRACT)
    with BuildSketch(Plane(origin=(-7, 0, 24), x_dir=(0, 0, -1), z_dir=(1, 0, 0))) as chamfer_4_piece_12:
        Polygon((2.3 + CHAMFER_4_SIZE, 0), (2.3, CHAMFER_4_SIZE_2), (2.3, 0), align=None)
    revolve(axis=Axis((-7, 0, 24), (0, 1, 0)), mode=Mode.SUBTRACT)

    # Фаска6: one chamfer whose edges measure the first distance from different faces: ONE call of the kernel's chamfer builder (chamfer() names one face for all edges)
    chamfer_6_edges_1 = [part.edges().sort_by_distance(p)[0] for p in [
        (-17, 21, -26.5),
        (-17, 21, 23.5),
    ]]
    chamfer_6_side_1 = [part.faces().sort_by_distance(p)[0] for p in [
        (-11.25, 21, 29.376381527),
    ]]
    chamfer_6_edges_2 = [part.edges().sort_by_distance(p)[0] for p in [
        (17, 21, 23.5),
        (17, 21, -26.5),
    ]]
    chamfer_6_side_2 = [part.faces().sort_by_distance(p)[0] for p in [
        (11.25, 21, 29.376381527),
    ]]
    chamfer_6 = BRepFilletAPI_MakeChamfer(part.part.solid().wrapped)
    for e in chamfer_6_edges_1:
        chamfer_6.Add(CHAMFER_6_SIZE, CHAMFER_6_SIZE2, e.wrapped, chamfer_6_side_1[0].wrapped)  # the first distance lies on this face
    for e in chamfer_6_edges_2:
        chamfer_6.Add(CHAMFER_6_SIZE, CHAMFER_6_SIZE2, e.wrapped, chamfer_6_side_2[0].wrapped)  # the first distance lies on this face
    add(Compound.cast(chamfer_6.Shape()), mode=Mode.REPLACE)

    # Эскиз8 → Бобышка-Вытянуть3 (add)
    with BuildSketch(Plane(origin=(0, 3, 0), x_dir=(1, 0, 0), z_dir=(0, 1, 0))):
        with Locations((17, -14)):
            Rectangle(SKETCH_8_W, SKETCH_8_H)
        with Locations((-17, -5.5)):
            Rectangle(SKETCH_8_W, SKETCH_8_H)
    extrude(amount=EXTRUDE_3_DEPTH)

    # Скругление6
    fillet_6_edges = [part.edges().sort_by_distance(p)[0] for p in [
        (19, 8, 16.5),
        (17, 3, 11.5),
        (19, 8, 11.5),
        (15, 3, 14),
        (15, 8, 11.5),
        (17, 3, 16.5),
        (15, 8, 16.5),
        (19, 13, 14),
        (17, 13, 11.5),
        (15, 13, 14),
        (17, 13, 16.5),
        (-19, 8, 3),
        (-17, 3, 8),
        (-19, 8, 8),
        (-15, 3, 5.5),
        (-15, 8, 8),
        (-17, 3, 3),
        (-15, 8, 3),
        (-19, 13, 5.5),
        (-17, 13, 8),
        (-15, 13, 5.5),
        (-17, 13, 3),
    ]]
    fillet(fillet_6_edges, radius=FILLET_6_R)

    # Скругление7
    fillet_7_edges = [part.edges().sort_by_distance(p)[0] for p in [
        (-13.5, 3, -29.25),
        (13.5, 3, -29.25),
    ]]
    fillet(fillet_7_edges, radius=FILLET_7_R)

    # Скругление8
    fillet_8_edges = [part.edges().sort_by_distance(p)[0] for p in [
        (0, 3, -30),
        (13.5, 13, -30),
        (12.914213562, 3.585786438, -30),
        (-12.914213562, 3.585786438, -30),
        (-13.5, 13, -30),
    ]]
    fillet(fillet_8_edges, radius=FILLET_8_R)

    # Фаска7
    chamfer_7_edges = [part.edges().sort_by_distance(p)[0] for p in [
        (0, 3, 10.1),
    ]]
    chamfer(chamfer_7_edges, length=CHAMFER_7_SIZE)


solid = part.part
